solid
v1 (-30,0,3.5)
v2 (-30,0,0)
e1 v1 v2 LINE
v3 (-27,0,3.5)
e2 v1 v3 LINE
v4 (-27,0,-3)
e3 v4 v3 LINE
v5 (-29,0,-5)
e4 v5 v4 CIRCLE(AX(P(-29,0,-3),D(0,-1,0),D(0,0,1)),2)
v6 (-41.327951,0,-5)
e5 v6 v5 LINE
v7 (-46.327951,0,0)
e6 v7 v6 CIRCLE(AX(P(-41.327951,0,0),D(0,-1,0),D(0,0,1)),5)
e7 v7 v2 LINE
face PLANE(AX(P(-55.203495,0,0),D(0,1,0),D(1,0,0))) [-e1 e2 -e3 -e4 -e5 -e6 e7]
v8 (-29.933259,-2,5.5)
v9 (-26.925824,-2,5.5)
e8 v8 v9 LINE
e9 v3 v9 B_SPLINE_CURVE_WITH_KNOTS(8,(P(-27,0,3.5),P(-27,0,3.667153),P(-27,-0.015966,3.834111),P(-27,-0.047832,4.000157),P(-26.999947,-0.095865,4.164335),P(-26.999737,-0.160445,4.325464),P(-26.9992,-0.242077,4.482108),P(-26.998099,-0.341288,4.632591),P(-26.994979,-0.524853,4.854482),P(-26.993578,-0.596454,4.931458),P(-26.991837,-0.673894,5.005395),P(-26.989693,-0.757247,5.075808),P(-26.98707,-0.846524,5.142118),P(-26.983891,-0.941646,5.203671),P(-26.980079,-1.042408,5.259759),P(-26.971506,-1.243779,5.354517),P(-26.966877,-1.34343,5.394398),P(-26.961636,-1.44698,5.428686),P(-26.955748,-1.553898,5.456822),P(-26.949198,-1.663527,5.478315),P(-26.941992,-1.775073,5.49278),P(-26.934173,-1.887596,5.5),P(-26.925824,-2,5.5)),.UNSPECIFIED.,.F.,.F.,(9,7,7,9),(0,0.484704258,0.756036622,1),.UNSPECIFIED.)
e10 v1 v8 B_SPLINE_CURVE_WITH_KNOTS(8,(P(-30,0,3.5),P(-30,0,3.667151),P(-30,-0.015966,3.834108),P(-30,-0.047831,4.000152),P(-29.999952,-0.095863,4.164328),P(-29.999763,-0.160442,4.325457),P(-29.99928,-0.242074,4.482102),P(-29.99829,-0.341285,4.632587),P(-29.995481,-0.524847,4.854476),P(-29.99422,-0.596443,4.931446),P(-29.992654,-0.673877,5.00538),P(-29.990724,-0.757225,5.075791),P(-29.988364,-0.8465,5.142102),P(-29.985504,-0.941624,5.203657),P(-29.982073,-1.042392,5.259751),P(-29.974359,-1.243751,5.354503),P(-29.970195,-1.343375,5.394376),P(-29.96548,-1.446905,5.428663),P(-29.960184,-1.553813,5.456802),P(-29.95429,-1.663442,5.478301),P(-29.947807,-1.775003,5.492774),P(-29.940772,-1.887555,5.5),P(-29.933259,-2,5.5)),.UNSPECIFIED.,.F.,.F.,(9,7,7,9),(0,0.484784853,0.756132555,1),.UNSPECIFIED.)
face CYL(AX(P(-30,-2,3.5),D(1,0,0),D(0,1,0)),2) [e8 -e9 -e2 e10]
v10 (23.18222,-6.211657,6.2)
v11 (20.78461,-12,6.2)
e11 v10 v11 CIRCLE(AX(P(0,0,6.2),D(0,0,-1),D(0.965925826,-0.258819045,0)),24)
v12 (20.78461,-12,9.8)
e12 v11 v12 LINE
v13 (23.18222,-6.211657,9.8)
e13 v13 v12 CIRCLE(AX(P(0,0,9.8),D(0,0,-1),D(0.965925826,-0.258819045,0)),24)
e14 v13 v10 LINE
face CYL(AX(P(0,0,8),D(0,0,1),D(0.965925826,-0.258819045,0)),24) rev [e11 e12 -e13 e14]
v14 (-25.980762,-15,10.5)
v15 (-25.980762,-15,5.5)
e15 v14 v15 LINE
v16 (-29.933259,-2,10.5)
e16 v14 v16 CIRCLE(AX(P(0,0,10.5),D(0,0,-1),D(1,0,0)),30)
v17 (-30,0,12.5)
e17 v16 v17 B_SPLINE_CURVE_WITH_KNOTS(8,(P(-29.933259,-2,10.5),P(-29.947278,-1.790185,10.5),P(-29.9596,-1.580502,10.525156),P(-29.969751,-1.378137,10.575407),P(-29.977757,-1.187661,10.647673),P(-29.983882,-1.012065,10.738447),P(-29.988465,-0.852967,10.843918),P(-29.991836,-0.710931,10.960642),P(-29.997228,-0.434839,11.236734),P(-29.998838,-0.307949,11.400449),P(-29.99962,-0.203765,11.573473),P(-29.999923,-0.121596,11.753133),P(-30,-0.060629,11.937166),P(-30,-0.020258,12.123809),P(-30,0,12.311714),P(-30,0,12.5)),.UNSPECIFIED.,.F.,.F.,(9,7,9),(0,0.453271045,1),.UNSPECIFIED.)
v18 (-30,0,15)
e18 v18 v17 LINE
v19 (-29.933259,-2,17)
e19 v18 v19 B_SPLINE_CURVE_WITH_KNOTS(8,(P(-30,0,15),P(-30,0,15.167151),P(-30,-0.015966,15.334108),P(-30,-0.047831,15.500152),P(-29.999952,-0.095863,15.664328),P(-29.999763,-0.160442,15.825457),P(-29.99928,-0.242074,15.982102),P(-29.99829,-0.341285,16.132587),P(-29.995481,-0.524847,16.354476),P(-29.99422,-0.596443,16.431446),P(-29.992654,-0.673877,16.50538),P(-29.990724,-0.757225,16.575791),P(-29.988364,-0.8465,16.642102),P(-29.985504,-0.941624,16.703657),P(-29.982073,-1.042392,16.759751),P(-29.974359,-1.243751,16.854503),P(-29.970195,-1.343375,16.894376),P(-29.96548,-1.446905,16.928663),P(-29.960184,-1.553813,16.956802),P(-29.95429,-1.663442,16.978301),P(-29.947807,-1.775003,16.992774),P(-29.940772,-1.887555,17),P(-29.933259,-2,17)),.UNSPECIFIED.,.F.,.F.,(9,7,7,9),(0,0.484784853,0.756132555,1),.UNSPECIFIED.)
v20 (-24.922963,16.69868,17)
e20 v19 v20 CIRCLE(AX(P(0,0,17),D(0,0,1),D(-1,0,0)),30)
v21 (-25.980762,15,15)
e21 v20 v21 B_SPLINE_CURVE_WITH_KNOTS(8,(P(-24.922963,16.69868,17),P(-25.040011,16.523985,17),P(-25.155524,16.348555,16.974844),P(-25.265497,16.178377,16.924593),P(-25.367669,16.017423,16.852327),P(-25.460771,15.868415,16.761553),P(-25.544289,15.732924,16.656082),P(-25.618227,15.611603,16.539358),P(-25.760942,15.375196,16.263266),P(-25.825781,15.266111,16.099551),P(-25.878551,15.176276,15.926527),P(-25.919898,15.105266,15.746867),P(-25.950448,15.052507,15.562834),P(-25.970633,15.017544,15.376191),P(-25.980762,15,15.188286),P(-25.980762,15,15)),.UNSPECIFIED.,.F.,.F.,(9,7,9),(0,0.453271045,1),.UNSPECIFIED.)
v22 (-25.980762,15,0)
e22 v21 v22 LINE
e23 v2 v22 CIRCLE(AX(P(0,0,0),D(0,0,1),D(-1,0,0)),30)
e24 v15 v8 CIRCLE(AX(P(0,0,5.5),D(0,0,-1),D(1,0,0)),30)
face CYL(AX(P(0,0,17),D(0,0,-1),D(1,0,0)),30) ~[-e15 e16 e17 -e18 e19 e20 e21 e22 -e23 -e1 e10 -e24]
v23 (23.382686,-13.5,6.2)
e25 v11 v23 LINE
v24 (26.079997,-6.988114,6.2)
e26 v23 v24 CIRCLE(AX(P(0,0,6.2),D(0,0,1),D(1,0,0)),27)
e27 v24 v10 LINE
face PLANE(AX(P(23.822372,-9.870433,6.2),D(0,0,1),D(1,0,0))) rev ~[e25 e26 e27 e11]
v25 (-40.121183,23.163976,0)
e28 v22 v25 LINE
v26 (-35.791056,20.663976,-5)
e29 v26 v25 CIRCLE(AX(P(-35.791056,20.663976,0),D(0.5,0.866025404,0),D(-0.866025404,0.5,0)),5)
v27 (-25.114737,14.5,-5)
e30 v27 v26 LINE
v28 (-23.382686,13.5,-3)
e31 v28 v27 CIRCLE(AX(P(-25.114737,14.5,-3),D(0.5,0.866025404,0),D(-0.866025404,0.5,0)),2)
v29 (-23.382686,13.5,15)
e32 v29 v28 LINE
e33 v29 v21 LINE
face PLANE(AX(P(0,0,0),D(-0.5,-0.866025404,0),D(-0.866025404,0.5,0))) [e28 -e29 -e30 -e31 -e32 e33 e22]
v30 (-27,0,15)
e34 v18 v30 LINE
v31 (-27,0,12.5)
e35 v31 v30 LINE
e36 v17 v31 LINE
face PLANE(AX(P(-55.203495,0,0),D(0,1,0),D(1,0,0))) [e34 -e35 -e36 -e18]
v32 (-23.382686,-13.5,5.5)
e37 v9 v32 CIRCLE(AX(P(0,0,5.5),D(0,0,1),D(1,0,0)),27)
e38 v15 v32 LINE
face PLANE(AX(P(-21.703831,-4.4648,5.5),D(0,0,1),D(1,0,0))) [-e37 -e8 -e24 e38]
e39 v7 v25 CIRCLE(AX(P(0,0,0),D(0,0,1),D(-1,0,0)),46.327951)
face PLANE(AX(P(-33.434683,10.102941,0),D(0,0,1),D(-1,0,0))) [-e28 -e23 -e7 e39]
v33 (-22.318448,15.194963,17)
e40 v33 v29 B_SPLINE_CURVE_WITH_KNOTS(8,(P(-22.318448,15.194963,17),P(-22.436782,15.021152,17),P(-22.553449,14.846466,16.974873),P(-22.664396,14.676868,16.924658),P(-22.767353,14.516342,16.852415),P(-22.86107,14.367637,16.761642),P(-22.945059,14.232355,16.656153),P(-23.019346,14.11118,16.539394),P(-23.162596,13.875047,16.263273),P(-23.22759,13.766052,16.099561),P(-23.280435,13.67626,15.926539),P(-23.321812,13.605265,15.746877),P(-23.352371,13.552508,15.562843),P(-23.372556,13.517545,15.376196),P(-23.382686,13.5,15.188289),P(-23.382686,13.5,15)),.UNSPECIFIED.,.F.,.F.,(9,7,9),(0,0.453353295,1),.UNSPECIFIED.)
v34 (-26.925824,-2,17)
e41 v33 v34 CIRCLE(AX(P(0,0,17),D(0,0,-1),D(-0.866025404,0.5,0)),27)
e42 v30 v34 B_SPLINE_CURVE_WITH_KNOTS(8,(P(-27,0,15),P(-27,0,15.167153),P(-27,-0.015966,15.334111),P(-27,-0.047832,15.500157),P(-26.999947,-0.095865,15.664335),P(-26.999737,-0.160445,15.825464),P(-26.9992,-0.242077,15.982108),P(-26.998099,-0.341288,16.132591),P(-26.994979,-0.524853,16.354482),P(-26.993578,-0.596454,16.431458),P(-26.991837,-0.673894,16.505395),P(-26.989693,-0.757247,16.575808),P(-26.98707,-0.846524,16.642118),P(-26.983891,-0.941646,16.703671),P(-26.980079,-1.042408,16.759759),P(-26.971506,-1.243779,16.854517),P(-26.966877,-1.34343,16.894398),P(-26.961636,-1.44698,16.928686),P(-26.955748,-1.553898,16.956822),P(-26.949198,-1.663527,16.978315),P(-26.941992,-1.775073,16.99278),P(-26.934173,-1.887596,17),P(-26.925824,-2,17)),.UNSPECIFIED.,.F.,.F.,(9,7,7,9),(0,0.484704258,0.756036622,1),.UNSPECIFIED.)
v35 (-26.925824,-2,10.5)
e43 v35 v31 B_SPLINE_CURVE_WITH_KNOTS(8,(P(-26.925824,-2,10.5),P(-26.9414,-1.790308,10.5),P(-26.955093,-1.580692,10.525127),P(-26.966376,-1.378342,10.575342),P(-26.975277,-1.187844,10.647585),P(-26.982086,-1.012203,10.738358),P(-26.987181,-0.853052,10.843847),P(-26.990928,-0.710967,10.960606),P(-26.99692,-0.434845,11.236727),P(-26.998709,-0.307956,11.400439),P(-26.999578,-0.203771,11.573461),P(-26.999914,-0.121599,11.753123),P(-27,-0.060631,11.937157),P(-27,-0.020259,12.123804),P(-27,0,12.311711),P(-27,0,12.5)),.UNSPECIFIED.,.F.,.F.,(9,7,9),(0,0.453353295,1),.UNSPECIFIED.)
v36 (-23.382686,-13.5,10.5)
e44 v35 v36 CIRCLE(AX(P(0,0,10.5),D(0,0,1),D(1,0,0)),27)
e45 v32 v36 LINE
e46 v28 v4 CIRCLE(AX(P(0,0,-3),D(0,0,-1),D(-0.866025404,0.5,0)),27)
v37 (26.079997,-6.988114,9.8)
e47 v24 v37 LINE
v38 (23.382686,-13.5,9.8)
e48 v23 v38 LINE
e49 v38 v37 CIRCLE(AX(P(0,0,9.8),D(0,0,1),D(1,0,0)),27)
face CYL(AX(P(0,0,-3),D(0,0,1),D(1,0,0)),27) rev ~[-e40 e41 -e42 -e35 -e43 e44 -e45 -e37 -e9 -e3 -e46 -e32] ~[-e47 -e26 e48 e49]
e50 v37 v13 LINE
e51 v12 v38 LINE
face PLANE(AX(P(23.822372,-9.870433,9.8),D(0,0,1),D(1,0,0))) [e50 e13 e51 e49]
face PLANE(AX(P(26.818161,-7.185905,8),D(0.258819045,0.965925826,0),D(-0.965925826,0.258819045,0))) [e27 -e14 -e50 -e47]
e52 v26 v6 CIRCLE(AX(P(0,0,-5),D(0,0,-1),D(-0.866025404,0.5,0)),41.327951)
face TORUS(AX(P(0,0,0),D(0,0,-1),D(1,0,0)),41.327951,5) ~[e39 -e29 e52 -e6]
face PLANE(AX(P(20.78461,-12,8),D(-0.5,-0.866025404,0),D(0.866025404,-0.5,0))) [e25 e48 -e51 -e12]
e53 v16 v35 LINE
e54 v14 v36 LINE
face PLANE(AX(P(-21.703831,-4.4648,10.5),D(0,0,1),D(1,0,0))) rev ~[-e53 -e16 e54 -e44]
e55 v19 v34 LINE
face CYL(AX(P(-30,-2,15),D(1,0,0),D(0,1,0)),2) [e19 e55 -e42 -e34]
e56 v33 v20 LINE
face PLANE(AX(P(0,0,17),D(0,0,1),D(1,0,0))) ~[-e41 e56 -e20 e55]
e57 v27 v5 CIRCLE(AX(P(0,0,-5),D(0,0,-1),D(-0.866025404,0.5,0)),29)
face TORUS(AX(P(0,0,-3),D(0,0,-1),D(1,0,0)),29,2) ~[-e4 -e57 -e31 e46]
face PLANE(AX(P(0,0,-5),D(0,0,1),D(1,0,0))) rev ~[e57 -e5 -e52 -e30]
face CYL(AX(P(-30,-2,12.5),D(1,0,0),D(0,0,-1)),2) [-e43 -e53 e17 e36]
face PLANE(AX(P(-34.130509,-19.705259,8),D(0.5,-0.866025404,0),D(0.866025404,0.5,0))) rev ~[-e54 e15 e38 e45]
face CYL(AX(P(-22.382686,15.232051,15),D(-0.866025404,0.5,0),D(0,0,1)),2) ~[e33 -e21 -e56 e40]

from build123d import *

# Parameters (mm, degrees)
F3_DEPTH      = 17.001
F3_DEPTH_BACK = 25
F5_ANGLE      = -180
F7_DEPTH      = 1.8
F8_DEPTH      = 2.5
F9_R          = 2


with BuildPart() as f1:
    # F0 (on Front) → F1 (revolve)
    with BuildSketch(Plane.XZ):
        with BuildLine():
            Line((-27, 17), (-30, 17))
            Line((-30, 17), (-30, 0))
            Line((-30, 0), (-46.3279513852, 0))
            ThreePointArc((-46.3279513852, 0), (-44.8634852911, -3.5355339059), (-41.3279513852, -5))
            Line((-41.3279513852, -5), (-29, -5))
            ThreePointArc((-29, -5), (-27.5857864376, -4.4142135624), (-27, -3))
            Line((-27, -3), (-27, 17))
        make_face()
    revolve(axis=Axis((0, 0, 7.2955568321), (0, 0, 1)))

    # F2 (on Top) → F3 (cut, two sides)
    with BuildSketch(Plane.XY) as f3_sk:
        Polygon((55.203495074, 0), (0, 0), (55.203495074, -31.8717527412), align=None)
    extrude(amount=F3_DEPTH, mode=Mode.SUBTRACT)
    extrude(f3_sk.sketch, amount=-F3_DEPTH_BACK, mode=Mode.SUBTRACT)


with BuildPart() as f1_1:
    # F5: moved
    add(f1.part.rotate(Axis((0, 0, 17), (0, 0, -1)), F5_ANGLE))

    # F6 (on offset) → F7 (join, symmetric)
    with BuildSketch(Plane.XY.offset(8)):
        with BuildLine():
            ThreePointArc((23.1822198309, -6.2116570825), (22.1731087803, -9.1844023768), (20.7846096908, -12))
            Line((20.7846096908, -12), (24.0563691046, -13.8889511783))
            Line((24.0563691046, -13.8889511783), (26.818160989, -7.1859045795))
            Line((26.818160989, -7.1859045795), (23.1822198309, -6.2116570825))
        make_face()
    extrude(amount=F7_DEPTH, both=True)

    # F6 (on offset) → F8 (cut, symmetric)
    with BuildSketch(Plane.XY.offset(8)):
        Polygon((-34.1305090562, -19.7052585912), (0, 0), (-34.9063649774, 6.3153640367), align=None)
    extrude(amount=F8_DEPTH, both=True, mode=Mode.SUBTRACT)

    # F9
    f9_edges = [f1_1.edges().sort_by_distance(p)[0] for p in [
        (-28.5, 0, 5.5),
        (-28.5, 0, 10.5),
        (-28.5, 0, 17),
        (-24.681724, 14.25, 17),
    ]]
    fillet(f9_edges, radius=F9_R)


solid = f1_1.part
